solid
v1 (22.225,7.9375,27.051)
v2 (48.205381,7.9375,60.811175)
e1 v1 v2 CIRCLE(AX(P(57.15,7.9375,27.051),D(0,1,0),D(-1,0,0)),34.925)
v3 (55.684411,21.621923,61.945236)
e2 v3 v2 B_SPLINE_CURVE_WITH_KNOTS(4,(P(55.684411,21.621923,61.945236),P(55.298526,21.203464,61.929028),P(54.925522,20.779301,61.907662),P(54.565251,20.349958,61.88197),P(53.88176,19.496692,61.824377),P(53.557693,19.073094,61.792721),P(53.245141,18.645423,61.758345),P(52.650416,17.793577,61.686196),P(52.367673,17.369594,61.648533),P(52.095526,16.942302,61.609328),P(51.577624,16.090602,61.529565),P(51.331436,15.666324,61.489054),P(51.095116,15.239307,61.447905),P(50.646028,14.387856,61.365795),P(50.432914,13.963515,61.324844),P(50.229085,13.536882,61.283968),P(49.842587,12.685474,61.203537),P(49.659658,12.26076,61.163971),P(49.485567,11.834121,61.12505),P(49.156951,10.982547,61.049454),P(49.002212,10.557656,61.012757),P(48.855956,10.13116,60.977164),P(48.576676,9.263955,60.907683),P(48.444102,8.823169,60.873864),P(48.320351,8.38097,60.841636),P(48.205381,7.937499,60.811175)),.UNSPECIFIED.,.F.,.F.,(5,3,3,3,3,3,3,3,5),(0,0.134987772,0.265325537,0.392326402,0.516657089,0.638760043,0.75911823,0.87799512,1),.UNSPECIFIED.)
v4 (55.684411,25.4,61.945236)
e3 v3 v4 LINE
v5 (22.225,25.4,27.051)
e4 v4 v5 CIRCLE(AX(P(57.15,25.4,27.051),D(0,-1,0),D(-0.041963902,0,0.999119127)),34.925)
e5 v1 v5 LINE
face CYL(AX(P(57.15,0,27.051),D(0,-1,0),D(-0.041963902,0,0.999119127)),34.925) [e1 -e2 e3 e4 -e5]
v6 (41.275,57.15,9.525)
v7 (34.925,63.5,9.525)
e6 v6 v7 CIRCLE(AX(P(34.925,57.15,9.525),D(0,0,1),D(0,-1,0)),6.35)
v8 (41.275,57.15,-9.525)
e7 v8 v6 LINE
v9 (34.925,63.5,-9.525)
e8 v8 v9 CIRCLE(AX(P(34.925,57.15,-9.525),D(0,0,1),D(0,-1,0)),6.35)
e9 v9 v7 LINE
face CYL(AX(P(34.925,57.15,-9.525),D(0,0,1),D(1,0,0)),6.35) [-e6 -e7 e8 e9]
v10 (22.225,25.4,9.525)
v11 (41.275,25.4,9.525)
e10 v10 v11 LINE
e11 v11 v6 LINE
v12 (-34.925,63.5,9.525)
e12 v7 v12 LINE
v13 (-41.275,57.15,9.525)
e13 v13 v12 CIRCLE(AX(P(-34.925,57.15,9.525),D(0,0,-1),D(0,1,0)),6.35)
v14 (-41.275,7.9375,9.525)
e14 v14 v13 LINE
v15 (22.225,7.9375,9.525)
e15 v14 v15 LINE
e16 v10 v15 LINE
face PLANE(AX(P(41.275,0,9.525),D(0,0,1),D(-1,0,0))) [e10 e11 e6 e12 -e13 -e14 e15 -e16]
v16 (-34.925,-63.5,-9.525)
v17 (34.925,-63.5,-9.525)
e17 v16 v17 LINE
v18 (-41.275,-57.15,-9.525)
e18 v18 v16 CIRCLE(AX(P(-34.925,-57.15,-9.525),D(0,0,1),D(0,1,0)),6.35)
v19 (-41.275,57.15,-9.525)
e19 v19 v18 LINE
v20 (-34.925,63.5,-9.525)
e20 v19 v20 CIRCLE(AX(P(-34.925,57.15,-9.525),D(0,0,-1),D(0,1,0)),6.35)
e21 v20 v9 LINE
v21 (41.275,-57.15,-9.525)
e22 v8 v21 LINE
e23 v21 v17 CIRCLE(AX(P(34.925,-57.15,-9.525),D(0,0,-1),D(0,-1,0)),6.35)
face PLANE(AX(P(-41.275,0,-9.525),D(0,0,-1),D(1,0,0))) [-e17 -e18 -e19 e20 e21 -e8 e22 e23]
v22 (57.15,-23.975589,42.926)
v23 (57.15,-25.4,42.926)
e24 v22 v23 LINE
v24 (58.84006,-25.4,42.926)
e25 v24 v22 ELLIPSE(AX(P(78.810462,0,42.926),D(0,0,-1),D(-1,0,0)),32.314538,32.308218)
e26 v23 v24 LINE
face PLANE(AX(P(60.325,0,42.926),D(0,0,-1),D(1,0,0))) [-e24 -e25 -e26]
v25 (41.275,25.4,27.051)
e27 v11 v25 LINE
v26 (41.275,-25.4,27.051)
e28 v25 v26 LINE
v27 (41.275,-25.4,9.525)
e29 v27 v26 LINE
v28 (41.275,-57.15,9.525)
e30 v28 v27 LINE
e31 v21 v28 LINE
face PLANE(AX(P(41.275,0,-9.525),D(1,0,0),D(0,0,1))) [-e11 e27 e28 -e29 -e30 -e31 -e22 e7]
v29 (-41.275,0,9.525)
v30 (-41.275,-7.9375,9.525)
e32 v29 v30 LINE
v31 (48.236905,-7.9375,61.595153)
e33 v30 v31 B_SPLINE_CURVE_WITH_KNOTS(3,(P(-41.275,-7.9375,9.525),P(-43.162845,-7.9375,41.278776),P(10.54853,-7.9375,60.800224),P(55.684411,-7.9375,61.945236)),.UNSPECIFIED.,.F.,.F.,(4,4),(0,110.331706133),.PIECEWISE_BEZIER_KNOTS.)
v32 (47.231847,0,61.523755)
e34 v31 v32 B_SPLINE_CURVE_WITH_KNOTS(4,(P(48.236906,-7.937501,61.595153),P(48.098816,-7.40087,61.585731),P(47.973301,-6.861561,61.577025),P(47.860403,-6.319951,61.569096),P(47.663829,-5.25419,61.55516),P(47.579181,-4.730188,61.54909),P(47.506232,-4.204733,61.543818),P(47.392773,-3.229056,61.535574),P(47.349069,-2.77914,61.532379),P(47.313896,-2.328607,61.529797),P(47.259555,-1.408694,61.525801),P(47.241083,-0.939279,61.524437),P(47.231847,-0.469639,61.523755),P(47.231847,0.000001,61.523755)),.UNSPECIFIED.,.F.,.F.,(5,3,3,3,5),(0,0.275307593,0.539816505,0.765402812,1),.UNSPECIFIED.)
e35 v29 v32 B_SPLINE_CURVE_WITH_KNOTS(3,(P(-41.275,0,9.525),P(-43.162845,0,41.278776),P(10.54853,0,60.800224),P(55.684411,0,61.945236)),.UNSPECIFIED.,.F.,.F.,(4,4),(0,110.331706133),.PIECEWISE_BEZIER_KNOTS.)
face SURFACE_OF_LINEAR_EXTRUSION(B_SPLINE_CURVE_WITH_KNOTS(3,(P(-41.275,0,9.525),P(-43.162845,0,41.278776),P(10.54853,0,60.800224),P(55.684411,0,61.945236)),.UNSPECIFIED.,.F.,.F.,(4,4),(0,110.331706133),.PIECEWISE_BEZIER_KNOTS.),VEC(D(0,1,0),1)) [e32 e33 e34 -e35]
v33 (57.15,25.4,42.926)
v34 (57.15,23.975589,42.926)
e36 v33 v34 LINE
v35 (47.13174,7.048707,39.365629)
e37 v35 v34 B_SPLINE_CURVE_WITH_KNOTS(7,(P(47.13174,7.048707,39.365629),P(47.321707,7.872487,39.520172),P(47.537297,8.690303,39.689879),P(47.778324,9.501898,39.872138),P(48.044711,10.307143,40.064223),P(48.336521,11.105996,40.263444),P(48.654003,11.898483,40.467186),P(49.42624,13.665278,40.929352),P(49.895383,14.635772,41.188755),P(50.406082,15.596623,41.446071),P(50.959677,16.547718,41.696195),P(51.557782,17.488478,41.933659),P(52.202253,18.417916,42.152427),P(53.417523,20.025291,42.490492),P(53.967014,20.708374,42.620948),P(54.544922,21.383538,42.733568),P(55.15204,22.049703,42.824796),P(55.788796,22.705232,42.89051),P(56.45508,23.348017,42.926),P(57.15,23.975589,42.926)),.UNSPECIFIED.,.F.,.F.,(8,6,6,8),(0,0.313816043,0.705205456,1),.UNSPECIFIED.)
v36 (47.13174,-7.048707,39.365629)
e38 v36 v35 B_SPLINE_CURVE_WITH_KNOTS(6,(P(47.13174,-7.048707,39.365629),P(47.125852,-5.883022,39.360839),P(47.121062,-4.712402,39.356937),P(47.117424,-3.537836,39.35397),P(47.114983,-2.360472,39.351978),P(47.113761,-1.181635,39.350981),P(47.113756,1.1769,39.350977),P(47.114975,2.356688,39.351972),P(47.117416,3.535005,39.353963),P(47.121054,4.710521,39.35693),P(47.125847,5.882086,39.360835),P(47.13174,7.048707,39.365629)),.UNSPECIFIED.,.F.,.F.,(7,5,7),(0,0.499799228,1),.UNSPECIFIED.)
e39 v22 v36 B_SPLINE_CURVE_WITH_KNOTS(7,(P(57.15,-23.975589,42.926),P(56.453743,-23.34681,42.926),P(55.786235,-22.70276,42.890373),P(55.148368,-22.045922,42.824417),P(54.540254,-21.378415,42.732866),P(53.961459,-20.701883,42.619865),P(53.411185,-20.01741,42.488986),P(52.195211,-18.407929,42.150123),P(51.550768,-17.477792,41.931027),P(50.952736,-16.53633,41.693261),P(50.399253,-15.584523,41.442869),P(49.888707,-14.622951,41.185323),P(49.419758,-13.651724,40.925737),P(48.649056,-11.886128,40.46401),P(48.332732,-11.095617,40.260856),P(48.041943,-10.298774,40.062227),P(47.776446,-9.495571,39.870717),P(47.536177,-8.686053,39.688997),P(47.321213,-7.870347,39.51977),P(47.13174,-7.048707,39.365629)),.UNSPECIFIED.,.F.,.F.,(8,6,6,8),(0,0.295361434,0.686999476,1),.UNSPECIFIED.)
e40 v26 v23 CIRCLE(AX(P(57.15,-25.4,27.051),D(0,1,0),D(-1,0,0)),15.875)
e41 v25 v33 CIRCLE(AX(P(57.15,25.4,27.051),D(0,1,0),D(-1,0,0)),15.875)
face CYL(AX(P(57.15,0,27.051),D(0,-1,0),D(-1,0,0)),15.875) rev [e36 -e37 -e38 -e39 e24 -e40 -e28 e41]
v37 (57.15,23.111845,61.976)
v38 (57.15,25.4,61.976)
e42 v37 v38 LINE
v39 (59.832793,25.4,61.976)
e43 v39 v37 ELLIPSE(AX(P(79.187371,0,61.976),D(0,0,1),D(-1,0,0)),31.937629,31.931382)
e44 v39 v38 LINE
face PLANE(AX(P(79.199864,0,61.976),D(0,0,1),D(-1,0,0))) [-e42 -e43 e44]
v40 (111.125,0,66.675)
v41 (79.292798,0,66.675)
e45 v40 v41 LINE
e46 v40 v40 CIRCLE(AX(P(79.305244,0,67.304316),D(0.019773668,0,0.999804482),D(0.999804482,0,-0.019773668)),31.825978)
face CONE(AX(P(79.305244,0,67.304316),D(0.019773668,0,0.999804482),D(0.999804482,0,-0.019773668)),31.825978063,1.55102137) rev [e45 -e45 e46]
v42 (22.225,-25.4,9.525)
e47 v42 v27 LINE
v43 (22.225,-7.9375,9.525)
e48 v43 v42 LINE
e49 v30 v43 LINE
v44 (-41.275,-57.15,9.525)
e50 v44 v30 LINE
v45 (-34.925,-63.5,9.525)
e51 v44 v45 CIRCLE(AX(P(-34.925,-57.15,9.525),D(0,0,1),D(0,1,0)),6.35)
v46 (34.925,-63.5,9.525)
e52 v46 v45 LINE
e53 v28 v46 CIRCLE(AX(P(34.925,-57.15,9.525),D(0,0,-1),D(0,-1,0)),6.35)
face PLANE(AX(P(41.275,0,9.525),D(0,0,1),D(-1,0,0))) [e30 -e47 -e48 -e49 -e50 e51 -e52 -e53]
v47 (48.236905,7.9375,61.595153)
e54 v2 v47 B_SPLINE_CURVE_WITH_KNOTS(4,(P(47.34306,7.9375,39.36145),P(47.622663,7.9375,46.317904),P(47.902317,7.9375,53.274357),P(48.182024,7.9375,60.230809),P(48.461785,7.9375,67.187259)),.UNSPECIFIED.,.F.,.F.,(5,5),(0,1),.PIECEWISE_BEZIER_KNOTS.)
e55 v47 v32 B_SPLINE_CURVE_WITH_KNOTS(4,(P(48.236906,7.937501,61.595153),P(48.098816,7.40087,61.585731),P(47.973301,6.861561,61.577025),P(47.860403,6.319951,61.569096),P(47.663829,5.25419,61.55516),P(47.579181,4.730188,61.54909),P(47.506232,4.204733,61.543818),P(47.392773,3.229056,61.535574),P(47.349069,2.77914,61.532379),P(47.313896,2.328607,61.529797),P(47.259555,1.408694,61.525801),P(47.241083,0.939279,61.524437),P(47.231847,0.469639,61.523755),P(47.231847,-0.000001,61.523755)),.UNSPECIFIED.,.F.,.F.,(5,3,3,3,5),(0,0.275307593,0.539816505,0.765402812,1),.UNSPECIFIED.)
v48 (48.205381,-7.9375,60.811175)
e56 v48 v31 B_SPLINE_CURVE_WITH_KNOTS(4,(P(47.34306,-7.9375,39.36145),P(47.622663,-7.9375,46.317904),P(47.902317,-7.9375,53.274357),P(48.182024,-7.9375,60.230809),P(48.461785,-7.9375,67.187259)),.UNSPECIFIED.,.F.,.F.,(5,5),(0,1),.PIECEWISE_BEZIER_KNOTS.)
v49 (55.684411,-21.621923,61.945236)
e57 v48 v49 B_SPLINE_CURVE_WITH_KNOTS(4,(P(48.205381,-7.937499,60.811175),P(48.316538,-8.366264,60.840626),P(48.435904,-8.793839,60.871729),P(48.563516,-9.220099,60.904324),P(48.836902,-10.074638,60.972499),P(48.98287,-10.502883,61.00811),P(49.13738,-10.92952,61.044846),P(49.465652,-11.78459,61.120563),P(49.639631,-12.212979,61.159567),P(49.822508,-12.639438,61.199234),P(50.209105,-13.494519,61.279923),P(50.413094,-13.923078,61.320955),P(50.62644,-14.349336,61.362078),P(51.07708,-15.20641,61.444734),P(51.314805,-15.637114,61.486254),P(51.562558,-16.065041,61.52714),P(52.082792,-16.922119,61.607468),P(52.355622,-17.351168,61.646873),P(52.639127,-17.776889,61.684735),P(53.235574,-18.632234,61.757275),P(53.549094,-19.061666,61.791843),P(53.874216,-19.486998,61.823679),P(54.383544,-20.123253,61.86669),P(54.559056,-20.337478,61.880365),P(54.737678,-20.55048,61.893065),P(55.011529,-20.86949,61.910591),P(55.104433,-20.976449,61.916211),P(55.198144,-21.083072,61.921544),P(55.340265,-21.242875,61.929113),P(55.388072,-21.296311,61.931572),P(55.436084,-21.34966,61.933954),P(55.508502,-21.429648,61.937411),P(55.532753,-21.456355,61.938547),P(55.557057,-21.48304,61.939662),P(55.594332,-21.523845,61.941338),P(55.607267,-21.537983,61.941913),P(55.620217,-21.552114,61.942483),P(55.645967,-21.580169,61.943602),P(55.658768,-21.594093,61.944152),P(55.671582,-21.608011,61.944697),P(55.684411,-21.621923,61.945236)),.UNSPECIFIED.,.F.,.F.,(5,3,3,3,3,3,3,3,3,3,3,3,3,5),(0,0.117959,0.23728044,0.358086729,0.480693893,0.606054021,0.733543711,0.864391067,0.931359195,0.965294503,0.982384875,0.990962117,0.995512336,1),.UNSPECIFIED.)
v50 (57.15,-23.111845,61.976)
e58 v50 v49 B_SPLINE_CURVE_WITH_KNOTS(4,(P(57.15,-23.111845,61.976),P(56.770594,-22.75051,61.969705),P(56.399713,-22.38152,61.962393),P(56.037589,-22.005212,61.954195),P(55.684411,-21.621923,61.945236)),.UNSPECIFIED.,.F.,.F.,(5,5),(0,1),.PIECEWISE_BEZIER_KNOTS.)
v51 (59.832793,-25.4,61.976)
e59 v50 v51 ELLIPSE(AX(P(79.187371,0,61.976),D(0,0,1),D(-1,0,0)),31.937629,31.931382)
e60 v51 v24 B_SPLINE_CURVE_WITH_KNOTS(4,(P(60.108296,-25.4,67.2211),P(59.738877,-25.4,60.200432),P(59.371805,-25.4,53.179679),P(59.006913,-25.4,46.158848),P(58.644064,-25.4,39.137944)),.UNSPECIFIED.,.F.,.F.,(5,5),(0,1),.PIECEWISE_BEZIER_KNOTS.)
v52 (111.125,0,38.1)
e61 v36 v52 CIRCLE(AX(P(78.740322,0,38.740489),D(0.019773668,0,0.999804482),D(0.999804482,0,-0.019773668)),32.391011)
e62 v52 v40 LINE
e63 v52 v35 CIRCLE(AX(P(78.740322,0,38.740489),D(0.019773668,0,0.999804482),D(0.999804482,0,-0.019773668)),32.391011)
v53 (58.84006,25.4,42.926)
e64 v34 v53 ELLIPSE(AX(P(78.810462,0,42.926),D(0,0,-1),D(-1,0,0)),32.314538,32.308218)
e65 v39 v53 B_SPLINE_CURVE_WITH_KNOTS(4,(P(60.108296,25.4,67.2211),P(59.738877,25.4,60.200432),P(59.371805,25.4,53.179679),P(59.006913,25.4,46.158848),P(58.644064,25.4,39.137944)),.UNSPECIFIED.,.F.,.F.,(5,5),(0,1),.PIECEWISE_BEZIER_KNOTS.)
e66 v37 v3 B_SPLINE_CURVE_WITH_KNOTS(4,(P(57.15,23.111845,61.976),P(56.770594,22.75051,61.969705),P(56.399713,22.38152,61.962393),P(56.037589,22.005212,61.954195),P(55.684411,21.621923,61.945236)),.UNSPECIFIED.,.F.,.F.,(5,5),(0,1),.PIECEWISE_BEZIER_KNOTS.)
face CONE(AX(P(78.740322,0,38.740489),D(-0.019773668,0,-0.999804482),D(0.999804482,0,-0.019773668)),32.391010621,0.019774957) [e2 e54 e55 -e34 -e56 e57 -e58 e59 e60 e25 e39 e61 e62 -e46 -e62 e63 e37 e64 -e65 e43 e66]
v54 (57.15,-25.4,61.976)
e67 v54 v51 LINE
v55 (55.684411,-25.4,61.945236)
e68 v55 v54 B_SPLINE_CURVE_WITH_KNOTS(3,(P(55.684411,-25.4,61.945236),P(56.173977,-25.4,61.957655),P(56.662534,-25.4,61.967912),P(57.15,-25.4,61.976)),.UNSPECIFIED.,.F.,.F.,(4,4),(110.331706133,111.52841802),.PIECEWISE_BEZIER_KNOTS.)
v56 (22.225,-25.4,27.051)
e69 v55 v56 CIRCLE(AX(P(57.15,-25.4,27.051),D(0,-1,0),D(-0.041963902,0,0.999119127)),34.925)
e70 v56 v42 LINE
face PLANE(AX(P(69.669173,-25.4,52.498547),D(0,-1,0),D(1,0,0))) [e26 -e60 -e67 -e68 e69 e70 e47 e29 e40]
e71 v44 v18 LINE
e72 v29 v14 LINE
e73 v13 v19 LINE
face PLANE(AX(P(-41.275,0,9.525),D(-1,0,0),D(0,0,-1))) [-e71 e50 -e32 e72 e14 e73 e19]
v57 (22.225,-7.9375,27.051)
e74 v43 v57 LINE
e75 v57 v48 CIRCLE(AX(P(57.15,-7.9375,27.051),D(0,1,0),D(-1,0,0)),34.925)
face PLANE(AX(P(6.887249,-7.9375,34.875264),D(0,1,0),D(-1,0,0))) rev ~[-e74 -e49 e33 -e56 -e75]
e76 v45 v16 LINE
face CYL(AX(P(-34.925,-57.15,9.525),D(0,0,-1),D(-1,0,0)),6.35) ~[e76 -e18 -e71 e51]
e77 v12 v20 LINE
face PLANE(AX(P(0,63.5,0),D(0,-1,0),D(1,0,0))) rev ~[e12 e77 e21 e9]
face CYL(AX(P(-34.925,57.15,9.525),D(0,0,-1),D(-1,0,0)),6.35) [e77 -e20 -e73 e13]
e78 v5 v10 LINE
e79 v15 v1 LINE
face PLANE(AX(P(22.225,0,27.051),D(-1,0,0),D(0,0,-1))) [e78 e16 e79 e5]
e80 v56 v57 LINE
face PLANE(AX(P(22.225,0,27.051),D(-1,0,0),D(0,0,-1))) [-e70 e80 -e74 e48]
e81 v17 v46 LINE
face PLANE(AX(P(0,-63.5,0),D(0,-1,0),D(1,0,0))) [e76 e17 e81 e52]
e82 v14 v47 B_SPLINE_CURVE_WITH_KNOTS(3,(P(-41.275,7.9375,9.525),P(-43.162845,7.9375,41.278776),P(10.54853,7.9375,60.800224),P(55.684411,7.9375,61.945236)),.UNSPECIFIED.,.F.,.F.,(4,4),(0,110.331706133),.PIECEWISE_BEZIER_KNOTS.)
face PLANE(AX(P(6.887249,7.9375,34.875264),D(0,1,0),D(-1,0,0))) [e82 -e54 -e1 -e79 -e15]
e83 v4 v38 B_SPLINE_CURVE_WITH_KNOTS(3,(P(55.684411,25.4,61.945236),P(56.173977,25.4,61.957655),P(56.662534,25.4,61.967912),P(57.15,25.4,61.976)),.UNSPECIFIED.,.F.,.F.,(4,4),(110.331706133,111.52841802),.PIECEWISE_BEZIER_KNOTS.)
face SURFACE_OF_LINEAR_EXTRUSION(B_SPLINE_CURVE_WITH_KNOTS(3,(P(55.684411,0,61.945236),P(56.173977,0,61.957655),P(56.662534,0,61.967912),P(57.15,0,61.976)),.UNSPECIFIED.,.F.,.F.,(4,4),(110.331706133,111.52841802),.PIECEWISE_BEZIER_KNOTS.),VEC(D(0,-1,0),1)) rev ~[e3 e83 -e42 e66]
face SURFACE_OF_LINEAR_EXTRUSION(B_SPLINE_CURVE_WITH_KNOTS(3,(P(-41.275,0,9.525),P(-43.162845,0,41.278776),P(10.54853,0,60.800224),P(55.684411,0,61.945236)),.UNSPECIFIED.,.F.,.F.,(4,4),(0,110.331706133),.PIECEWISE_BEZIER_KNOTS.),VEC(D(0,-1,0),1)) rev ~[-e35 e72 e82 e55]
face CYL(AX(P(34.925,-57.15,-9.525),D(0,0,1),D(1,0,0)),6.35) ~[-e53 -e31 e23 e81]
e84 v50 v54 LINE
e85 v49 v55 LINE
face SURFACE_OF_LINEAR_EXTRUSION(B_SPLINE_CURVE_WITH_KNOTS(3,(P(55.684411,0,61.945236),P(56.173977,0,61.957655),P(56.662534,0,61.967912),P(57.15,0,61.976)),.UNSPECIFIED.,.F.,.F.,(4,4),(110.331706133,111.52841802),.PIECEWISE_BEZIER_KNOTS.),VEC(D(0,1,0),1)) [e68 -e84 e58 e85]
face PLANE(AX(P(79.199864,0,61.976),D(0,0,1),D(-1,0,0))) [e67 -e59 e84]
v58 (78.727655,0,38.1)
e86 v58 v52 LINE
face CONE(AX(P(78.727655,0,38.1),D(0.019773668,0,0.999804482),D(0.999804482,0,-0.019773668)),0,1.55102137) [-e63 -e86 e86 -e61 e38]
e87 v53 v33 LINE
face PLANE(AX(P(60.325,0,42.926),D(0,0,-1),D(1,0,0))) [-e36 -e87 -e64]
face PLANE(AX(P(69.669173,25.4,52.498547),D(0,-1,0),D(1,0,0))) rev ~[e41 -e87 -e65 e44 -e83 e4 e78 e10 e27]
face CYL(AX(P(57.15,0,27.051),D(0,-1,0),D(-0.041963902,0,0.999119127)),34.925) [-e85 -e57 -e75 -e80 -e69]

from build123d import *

# Parameters (mm, degrees)
F1_DEPTH = 63.5
F2_DEPTH = 25.4
F3_DEPTH = 7.9375
F4_DEPTH = 25.4
F6_R     = 6.35


# Not quite as in the source:
# - a feature names something its author has since deleted; it is built from what else it names


with BuildPart() as f1:
    # F0 (on Front) → F1 (new body, symmetric)
    with BuildSketch(Plane.XZ):
        Polygon((22.225, 9.525), (-41.275, 9.525), (-41.275, -9.525), (41.275, -9.525), (41.275, 9.525), align=None)
    extrude(amount=F1_DEPTH, both=True)

    # F0 (on Front) → F2 (join, symmetric)
    with BuildSketch(Plane.XZ):
        with BuildLine():
            Line((22.225, 27.051), (22.225, 9.525))
            Line((22.225, 9.525), (41.275, 9.525))
            Line((41.275, 9.525), (41.275, 27.051))
            ThreePointArc((41.275, 27.051), (45.9246798487, 38.2763201513), (57.15, 42.926))
            Line((57.15, 42.926), (60.325, 42.926))
            Line((60.325, 42.926), (60.325, 61.976))
            Line((60.325, 61.976), (57.15, 61.976))
            add(Edge.make_bspline(
                [(55.6844107211, 61.9452355277), (56.1739766533, 61.9576548863), (56.6625337097, 61.9679123237), (57.15, 61.976)],
                knots=[110.3317061333, 110.3317061333, 110.3317061333, 110.3317061333, 111.5284180198, 111.5284180198, 111.5284180198, 111.5284180198], degree=3))
            ThreePointArc((55.6844107211, 61.9452355277), (31.9414565021, 51.2229870866), (22.225, 27.051))
        make_face()
    extrude(amount=F2_DEPTH, both=True)

    # F0 (on Front) → F3 (join, symmetric)
    with BuildSketch(Plane.XZ):
        with BuildLine():
            add(Edge.make_bspline(
                [(-41.275, 9.525), (-43.1628450735, 41.2787763348), (10.5485303307, 60.8002239091), (55.6844107211, 61.9452355277)],
                knots=[0, 0, 0, 0, 110.3317061333, 110.3317061333, 110.3317061333, 110.3317061333], degree=3))
            Line((-41.275, 9.525), (22.225, 9.525))
            Line((22.225, 9.525), (22.225, 27.051))
            ThreePointArc((22.225, 27.051), (31.9414565021, 51.2229870866), (55.6844107211, 61.9452355277))
        make_face()
    extrude(amount=F3_DEPTH, both=True)

    # F0 (on Front) → F4 (join, symmetric)
    with BuildSketch(Plane.XZ):
        Polygon((79.1998635302, 61.976), (60.325, 61.976), (60.325, 42.926), (78.823101495, 42.926), align=None)
    extrude(amount=F4_DEPTH, both=True)

    # F0 (on Front) → F5 (revolve)
    with BuildSketch(Plane.XZ):
        Polygon((79.2927981655, 66.675), (79.1998635302, 61.976), (78.823101495, 42.926), (78.7276551127, 38.1), (111.125, 38.1), (111.125, 66.675), align=None)
    revolve(axis=Axis((79.0102266391, 0, 52.3875), (0.0197736678, 0, 0.9998044819)))

    # F6
    f6_edges = [f1.edges().sort_by_distance(p)[0] for p in [
        (41.275, -63.5, 0),
        (-41.275, -63.5, 0),
        (-41.275, 63.5, 0),
        (41.275, 63.5, 0),
    ]]
    fillet(f6_edges, radius=F6_R)


solid = f1.part
